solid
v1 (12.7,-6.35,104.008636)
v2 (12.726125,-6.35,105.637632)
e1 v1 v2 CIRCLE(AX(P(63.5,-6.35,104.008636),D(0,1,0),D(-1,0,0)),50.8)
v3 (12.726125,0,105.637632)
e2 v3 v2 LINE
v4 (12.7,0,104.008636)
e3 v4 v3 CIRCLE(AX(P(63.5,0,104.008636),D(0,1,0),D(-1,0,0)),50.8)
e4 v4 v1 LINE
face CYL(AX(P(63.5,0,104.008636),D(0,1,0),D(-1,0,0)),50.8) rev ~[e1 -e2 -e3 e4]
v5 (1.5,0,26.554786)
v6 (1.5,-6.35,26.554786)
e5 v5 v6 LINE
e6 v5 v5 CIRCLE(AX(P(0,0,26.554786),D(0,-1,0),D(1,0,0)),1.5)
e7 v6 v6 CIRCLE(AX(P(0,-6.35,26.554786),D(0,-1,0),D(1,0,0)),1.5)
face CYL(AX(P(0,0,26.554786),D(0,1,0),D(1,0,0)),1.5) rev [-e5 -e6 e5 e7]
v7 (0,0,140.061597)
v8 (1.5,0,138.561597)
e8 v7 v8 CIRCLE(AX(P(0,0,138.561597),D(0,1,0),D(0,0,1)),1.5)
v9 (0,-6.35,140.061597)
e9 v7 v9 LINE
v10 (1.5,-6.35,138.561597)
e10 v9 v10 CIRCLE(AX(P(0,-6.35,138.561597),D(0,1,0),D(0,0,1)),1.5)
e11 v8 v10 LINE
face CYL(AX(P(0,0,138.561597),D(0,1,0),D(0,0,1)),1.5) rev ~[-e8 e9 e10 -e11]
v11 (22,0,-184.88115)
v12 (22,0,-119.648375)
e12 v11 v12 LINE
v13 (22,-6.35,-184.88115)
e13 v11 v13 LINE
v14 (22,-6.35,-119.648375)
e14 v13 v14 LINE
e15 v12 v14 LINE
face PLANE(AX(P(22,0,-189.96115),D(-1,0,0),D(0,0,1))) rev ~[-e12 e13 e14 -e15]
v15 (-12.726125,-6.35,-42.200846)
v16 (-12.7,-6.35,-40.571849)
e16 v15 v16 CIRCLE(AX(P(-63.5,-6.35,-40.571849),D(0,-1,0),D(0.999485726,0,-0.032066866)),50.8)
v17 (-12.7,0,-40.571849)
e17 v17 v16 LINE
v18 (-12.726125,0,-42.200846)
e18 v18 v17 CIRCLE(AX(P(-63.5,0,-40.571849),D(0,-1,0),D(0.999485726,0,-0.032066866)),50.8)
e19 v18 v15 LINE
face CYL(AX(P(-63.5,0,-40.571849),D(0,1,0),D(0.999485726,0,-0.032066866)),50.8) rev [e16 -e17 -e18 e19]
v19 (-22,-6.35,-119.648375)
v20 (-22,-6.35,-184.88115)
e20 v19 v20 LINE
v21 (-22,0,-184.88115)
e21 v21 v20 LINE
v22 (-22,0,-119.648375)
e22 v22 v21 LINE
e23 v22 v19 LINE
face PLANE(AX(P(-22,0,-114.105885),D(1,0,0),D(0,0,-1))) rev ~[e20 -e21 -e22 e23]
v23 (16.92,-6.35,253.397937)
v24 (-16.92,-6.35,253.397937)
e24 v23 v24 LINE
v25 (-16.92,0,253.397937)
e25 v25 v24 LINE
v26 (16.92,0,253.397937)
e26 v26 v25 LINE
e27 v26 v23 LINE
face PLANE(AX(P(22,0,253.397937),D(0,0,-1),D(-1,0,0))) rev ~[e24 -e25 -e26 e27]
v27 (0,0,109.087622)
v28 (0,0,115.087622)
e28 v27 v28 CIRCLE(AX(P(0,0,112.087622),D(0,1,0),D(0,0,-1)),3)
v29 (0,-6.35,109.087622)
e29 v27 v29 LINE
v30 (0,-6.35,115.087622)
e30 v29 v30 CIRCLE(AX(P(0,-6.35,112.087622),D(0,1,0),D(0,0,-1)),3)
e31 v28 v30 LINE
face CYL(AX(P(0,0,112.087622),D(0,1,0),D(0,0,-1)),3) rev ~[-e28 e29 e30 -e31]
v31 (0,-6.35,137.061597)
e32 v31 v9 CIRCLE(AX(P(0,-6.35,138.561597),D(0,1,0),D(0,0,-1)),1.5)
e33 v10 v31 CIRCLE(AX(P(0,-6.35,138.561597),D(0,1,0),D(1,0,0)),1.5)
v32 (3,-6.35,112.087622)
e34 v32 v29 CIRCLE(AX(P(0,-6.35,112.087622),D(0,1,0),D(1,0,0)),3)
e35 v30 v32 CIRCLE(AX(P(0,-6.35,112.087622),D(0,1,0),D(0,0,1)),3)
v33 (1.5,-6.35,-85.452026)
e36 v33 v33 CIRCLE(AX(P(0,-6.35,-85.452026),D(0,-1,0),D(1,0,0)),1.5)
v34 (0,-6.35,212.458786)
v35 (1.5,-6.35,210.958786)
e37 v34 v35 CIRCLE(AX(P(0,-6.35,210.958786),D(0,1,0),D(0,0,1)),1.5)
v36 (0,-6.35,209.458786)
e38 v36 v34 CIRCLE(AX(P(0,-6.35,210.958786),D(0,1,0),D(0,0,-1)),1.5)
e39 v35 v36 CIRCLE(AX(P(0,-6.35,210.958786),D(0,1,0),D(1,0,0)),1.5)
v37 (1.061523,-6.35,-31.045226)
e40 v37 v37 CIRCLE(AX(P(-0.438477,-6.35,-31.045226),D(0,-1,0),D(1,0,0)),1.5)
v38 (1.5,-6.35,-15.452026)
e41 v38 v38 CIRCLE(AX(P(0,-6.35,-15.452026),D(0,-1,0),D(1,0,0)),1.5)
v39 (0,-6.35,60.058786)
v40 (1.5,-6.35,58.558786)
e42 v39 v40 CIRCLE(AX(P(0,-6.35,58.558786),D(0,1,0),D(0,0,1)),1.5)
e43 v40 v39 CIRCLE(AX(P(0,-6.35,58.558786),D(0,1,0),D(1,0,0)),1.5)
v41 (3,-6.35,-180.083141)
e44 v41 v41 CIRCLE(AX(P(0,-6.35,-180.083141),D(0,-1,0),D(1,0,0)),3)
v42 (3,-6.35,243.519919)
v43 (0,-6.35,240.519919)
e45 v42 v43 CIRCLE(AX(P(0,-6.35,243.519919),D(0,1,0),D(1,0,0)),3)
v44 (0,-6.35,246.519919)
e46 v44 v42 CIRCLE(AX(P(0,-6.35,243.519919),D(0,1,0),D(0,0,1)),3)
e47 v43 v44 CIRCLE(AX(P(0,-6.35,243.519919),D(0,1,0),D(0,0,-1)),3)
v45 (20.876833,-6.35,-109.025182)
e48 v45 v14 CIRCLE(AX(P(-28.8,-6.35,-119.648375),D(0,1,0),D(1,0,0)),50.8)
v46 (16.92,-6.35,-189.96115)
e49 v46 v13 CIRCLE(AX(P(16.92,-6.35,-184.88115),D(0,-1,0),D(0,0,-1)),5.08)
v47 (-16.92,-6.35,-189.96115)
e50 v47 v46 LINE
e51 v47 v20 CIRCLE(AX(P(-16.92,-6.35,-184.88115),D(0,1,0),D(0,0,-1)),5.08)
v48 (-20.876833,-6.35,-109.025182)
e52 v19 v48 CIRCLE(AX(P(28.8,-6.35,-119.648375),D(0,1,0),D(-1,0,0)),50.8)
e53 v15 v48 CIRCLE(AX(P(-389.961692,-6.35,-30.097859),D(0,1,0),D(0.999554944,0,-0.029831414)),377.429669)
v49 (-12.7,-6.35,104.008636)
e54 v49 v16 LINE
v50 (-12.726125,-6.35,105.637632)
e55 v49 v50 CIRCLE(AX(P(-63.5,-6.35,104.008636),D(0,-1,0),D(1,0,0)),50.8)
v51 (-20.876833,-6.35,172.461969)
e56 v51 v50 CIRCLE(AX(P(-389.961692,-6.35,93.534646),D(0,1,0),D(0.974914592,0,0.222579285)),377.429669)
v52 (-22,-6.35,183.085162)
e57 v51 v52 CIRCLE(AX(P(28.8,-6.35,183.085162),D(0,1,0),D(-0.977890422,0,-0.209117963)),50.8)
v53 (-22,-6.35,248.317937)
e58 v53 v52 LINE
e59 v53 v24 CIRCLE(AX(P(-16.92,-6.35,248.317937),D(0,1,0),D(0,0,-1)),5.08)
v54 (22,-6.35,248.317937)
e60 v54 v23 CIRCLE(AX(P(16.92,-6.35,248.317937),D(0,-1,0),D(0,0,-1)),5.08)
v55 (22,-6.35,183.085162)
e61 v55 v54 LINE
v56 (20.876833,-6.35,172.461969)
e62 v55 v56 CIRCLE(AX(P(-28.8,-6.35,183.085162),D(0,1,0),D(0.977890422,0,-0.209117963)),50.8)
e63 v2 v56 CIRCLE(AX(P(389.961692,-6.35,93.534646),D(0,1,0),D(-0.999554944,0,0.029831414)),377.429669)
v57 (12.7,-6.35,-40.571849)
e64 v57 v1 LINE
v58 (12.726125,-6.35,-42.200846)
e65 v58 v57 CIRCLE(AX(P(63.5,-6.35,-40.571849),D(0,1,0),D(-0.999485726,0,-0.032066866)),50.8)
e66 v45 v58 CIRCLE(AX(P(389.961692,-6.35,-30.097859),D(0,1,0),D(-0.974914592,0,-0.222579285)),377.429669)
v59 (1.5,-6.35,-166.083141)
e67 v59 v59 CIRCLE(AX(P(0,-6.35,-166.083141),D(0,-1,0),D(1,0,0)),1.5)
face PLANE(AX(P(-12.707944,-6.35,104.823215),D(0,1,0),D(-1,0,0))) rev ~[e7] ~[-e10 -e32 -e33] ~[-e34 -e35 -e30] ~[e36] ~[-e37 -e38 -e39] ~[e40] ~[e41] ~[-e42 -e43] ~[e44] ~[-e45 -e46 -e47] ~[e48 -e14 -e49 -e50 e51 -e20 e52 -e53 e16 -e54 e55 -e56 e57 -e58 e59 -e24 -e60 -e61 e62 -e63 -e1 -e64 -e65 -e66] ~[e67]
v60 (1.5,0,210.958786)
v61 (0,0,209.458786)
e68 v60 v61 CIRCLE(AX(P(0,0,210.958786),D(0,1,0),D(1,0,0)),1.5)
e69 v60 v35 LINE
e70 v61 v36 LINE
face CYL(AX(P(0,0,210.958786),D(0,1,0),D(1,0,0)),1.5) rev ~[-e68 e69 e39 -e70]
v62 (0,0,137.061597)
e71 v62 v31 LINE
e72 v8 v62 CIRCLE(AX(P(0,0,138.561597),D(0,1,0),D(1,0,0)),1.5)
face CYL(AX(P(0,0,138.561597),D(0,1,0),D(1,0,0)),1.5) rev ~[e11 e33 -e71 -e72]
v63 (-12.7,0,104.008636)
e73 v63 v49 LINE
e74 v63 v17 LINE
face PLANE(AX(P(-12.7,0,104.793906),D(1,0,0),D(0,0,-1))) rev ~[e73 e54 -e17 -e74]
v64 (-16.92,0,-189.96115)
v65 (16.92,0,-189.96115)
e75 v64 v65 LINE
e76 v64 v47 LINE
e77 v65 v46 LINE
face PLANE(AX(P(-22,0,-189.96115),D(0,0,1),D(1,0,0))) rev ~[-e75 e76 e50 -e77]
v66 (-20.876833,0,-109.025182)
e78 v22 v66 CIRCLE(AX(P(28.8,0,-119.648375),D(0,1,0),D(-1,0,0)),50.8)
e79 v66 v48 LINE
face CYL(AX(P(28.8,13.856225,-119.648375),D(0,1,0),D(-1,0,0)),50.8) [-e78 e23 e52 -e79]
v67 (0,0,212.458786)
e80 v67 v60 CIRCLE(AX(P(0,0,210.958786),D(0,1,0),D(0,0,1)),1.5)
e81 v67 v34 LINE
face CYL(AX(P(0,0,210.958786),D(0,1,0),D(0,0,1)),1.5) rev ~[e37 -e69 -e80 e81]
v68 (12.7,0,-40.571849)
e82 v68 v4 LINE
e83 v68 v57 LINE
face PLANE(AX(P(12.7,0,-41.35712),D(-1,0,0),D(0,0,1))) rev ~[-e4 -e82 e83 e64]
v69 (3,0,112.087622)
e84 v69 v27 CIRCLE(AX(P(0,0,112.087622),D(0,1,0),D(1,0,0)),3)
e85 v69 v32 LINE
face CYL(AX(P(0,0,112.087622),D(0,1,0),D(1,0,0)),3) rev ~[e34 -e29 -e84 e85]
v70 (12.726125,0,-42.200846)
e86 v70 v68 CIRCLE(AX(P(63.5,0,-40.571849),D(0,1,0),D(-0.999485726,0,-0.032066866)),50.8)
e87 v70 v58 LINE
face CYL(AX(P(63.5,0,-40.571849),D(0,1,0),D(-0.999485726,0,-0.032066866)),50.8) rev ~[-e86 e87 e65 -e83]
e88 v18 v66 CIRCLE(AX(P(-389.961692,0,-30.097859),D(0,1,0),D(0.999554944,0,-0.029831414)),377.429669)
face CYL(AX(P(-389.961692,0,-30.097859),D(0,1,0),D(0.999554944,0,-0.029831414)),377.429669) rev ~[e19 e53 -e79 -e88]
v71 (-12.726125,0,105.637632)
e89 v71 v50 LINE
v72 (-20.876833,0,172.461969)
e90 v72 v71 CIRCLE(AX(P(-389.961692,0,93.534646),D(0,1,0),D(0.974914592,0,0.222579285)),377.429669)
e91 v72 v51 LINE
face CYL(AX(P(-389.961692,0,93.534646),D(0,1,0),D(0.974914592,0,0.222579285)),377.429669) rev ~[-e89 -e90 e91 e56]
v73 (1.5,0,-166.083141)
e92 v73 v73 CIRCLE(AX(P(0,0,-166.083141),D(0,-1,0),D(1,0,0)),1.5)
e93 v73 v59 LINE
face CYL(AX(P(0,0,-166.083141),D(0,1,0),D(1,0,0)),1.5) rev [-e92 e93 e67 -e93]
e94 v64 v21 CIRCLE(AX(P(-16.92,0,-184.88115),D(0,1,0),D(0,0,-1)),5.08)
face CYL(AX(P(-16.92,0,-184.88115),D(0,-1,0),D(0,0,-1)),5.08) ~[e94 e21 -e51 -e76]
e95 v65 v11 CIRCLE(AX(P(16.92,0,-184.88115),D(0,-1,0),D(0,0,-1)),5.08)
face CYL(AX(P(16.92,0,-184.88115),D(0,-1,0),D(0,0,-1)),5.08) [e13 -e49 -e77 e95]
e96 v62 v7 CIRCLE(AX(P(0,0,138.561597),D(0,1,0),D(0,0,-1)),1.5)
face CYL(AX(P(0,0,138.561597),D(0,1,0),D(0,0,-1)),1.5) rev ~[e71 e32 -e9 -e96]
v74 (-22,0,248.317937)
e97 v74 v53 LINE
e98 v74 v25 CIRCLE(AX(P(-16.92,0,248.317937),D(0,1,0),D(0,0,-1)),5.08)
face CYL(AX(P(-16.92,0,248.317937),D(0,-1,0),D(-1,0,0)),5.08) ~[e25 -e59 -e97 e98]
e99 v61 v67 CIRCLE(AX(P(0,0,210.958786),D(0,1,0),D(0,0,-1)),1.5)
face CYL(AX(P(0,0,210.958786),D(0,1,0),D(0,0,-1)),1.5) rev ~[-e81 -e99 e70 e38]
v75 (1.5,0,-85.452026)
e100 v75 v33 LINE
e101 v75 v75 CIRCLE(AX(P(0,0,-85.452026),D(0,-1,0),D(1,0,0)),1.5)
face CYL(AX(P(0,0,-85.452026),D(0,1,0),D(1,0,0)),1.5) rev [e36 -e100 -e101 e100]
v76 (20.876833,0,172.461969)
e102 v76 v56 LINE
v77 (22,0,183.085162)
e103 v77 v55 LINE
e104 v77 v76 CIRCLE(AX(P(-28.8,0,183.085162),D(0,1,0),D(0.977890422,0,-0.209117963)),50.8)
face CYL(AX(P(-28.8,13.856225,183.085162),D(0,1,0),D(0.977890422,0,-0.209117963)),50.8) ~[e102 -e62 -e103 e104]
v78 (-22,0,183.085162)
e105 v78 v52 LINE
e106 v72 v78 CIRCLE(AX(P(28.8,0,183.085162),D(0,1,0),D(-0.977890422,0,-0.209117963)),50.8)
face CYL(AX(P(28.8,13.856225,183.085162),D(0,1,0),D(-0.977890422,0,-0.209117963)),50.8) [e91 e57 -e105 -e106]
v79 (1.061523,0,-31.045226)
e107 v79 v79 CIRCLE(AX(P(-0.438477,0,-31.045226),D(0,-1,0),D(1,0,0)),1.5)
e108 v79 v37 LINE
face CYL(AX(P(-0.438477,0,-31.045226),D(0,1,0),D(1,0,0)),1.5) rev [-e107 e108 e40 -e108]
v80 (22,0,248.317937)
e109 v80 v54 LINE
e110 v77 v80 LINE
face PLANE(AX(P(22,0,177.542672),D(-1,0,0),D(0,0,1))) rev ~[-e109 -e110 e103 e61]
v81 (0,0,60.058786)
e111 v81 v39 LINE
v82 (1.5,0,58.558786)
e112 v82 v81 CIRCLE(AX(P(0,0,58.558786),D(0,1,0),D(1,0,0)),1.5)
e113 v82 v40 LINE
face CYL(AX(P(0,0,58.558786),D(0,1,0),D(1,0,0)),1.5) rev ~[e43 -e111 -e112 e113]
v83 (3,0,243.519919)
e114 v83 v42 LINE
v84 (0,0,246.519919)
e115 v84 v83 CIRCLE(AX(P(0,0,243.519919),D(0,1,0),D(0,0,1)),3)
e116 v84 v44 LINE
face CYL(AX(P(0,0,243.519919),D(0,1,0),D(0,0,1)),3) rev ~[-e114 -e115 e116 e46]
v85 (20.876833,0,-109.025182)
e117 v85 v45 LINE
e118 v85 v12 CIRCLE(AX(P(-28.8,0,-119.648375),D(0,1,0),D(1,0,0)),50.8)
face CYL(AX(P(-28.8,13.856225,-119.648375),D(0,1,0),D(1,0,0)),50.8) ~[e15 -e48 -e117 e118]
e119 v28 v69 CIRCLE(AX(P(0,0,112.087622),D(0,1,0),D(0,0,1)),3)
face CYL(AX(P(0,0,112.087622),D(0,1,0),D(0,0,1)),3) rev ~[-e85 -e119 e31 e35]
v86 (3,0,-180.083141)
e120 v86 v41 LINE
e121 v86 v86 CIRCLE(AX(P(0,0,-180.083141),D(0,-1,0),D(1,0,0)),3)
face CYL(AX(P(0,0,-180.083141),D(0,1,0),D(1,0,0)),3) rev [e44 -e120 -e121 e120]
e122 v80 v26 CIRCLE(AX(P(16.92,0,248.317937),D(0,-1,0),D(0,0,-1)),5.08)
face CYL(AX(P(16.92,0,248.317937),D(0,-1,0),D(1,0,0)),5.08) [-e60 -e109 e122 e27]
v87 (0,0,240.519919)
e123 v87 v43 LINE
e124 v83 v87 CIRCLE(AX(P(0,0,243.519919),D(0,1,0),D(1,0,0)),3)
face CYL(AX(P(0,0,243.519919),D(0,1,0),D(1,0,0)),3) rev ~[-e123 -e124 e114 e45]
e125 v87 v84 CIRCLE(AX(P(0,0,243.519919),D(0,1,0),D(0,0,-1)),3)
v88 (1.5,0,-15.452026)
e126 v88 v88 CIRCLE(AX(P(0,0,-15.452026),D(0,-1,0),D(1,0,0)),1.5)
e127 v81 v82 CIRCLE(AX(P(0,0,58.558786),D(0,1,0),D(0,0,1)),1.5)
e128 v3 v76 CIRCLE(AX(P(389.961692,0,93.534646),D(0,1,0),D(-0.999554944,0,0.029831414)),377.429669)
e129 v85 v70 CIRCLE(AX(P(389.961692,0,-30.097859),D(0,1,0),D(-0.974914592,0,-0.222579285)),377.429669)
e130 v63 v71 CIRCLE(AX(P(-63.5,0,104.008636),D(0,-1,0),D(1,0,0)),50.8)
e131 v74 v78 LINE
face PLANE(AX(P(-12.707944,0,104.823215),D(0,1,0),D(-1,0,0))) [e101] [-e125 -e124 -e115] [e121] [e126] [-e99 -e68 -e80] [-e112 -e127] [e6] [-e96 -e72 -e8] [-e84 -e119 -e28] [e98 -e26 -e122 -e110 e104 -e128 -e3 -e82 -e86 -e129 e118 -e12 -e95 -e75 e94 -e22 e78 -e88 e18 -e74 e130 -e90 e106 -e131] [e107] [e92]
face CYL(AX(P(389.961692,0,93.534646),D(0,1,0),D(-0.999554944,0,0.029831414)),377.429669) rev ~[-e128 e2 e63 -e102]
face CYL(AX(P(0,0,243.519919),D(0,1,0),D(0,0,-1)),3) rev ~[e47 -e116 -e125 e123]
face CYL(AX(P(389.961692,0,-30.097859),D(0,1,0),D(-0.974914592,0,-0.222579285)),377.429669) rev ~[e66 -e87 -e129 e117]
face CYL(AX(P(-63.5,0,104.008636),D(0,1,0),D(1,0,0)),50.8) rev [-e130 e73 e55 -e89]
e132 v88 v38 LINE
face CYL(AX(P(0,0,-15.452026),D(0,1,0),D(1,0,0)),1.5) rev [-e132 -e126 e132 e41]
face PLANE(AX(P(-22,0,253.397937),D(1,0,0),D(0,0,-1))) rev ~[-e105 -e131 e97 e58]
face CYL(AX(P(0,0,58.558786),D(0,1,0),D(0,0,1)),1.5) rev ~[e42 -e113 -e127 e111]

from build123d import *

# Parameters (mm, degrees)
F0_R        = 1.5
F0_R_2      = 3
F1_DEPTH    = 6.35
F2_R        = 5.08
F3_T1_DEPTH = 6.35
F3_T3_DEPTH = 34.0624500619


# Not quite as in the source:
# - a fillet or chamfer that OpenCascade refuses, or shapes differently, is made with other operations: its cross-section is extruded or revolved along the edge and cut away or added
# - a feature names something its author has since deleted; it is built from what else it names


with BuildPart() as f1:
    # F0 (on Front) → F1 (new body)
    with BuildSketch(Plane.XZ):
        with BuildLine():
            Line((-22, -189.9611499309), (-4.6853246795, -189.9611499309))
            Line((-4.6853246795, -189.9611499309), (0, -189.9611499309))
            Line((0, -189.9611499309), (4.6853246795, -189.9611499309))
            Line((4.6853246795, -189.9611499309), (22, -189.9611499309))
            Line((22, -189.9611499309), (22, -172.8709284505))
            Line((22, -172.8709284505), (22, -161.9910197589))
            Line((22, -161.9910197589), (22, -114.1058849427))
            ThreePointArc((22, -114.1058849427), (15.5787747464, -77.9579307824), (12.7, -41.3571195934))
            Line((12.7, -41.3571195934), (12.7, 104.7939062119))
            ThreePointArc((12.7, 104.7939062119), (15.5787747464, 141.3947174009), (22, 177.5426715612))
            Line((22, 177.5426715612), (22, 225.4278063774))
            Line((22, 225.4278063774), (22, 236.307715069))
            Line((22, 236.307715069), (22, 253.3979365494))
            Line((22, 253.3979365494), (4.6853246795, 253.3979365494))
            Line((4.6853246795, 253.3979365494), (0, 253.3979365494))
            Line((0, 253.3979365494), (-4.6853246795, 253.3979365494))
            Line((-4.6853246795, 253.3979365494), (-22, 253.3979365494))
            Line((-22, 253.3979365494), (-22, 236.307715069))
            Line((-22, 236.307715069), (-22, 225.4278063774))
            Line((-22, 225.4278063774), (-22, 177.5426715612))
            ThreePointArc((-22, 177.5426715612), (-15.5787747464, 141.3947174009), (-12.7, 104.7939062119))
            Line((-12.7, 104.7939062119), (-12.7, -41.3571195934))
            ThreePointArc((-12.7, -41.3571195934), (-15.5787747464, -77.9579307824), (-22, -114.1058849427))
            Line((-22, -114.1058849427), (-22, -161.9910197589))
            Line((-22, -161.9910197589), (-22, -172.8709284505))
            Line((-22, -172.8709284505), (-22, -189.9611499309))
        make_face()
        with Locations((-0.4384766798, -31.0452261312)):
            Circle(F0_R, mode=Mode.SUBTRACT)
        with Locations((0, -180.0831407309)):
            Circle(F0_R_2, mode=Mode.SUBTRACT)
        with Locations((0, -166.0831407309)):
            Circle(F0_R, mode=Mode.SUBTRACT)
        with Locations((0, -85.4520261312)):
            Circle(F0_R, mode=Mode.SUBTRACT)
        with Locations((0, -15.4520261312)):
            Circle(F0_R, mode=Mode.SUBTRACT)
        with Locations((0, 26.5547856688)):
            Circle(F0_R, mode=Mode.SUBTRACT)
        with BuildLine():
            ThreePointArc((1.5, 58.5587856688), (-1.0606601718, 57.4981254971), (0, 60.0587856688))
            ThreePointArc((0, 60.0587856688), (1.0606601718, 59.6194458406), (1.5, 58.5587856688))
        make_face(mode=Mode.SUBTRACT)
        with BuildLine():
            ThreePointArc((0, 109.0876222849), (-3, 112.0876222849), (0, 115.0876222849))
            ThreePointArc((0, 115.0876222849), (2.1213203436, 114.2089426284), (3, 112.0876222849))
            ThreePointArc((3, 112.0876222849), (2.1213203436, 109.9663019413), (0, 109.0876222849))
        make_face(mode=Mode.SUBTRACT)
        with BuildLine():
            ThreePointArc((0, 137.0615974688), (-1.5, 138.5615974688), (0, 140.0615974688))
            ThreePointArc((0, 140.0615974688), (1.0606601718, 139.6222576406), (1.5, 138.5615974688))
            ThreePointArc((1.5, 138.5615974688), (1.0606601718, 137.5009372971), (0, 137.0615974688))
        make_face(mode=Mode.SUBTRACT)
        with BuildLine():
            ThreePointArc((0, 209.4587856688), (-1.5, 210.9587856688), (0, 212.4587856688))
            ThreePointArc((0, 212.4587856688), (1.0606601718, 212.0194458406), (1.5, 210.9587856688))
            ThreePointArc((1.5, 210.9587856688), (1.0606601718, 209.8981254971), (0, 209.4587856688))
        make_face(mode=Mode.SUBTRACT)
        with BuildLine():
            ThreePointArc((0, 240.5199192026), (-3, 243.5199192026), (0, 246.5199192026))
            ThreePointArc((0, 246.5199192026), (2.1213203436, 245.6412395461), (3, 243.5199192026))
            ThreePointArc((3, 243.5199192026), (2.1213203436, 241.398598859), (0, 240.5199192026))
        make_face(mode=Mode.SUBTRACT)
    extrude(amount=F1_DEPTH)

    # F2
    f2_edges = [f1.edges().sort_by_distance(p)[0] for p in [
        (-22, -3.175, 253.397937),
        (22, -3.175, 253.397937),
        (22, -3.175, -189.96115),
        (-22, -3.175, -189.96115),
    ]]
    fillet(f2_edges, radius=F2_R)

    # F3: fillet of radius 50.8 on 8 edges, made by hand

    # F3_s2 → F3_t1 (join)
    with BuildSketch(Plane.XZ):
        with BuildLine():
            ThreePointArc((-12.7, 104.0086355302), (-12.7065317021, 104.8232386677), (-12.7261251288, 105.6376323271))
            ThreePointArc((-12.7261251288, 105.6376323271), (-12.7128266876, 105.2157765732), (-12.7, 104.7939062119))
            Line((-12.7, 104.7939062119), (-12.7, 104.0086355302))
        make_face()
        with BuildLine():
            ThreePointArc((12.7, 104.0086355302), (12.7065317021, 104.8232386677), (12.7261251288, 105.6376323271))
            ThreePointArc((12.7261251288, 105.6376323271), (12.7128266876, 105.2157765732), (12.7, 104.7939062119))
            Line((12.7, 104.7939062119), (12.7, 104.0086355302))
        make_face()
        with BuildLine():
            ThreePointArc((12.7261251288, -42.2008457086), (12.7065317021, -41.3864520492), (12.7, -40.5718489117))
            Line((12.7, -40.5718489117), (12.7, -41.3571195934))
            ThreePointArc((12.7, -41.3571195934), (12.7128266876, -41.7789899547), (12.7261251288, -42.2008457086))
        make_face()
        with BuildLine():
            ThreePointArc((-12.7261251288, -42.2008457086), (-12.7065317021, -41.3864520492), (-12.7, -40.5718489116))
            Line((-12.7, -40.5718489116), (-12.7, -41.3571195934))
            ThreePointArc((-12.7, -41.3571195934), (-12.7128266876, -41.7789899547), (-12.7261251288, -42.2008457086))
        make_face()
    extrude(amount=F3_T1_DEPTH)

    # F3_s4 → F3_t3 (cut)
    with BuildSketch(Plane.XZ.offset(-13.856225031)):
        with BuildLine():
            ThreePointArc((-22, -119.6483749551), (-21.7184280188, -114.3071737314), (-20.8768334444, -109.025182453))
            ThreePointArc((-20.8768334444, -109.025182453), (-21.429661091, -111.5674692633), (-22, -114.1058849427))
            Line((-22, -114.1058849427), (-22, -119.6483749551))
        make_face()
        with BuildLine():
            ThreePointArc((22, -119.6483749551), (21.7184280188, -114.3071737314), (20.8768334444, -109.025182453))
            ThreePointArc((20.8768334444, -109.025182453), (21.429661091, -111.5674692633), (22, -114.1058849427))
            Line((22, -114.1058849427), (22, -119.6483749551))
        make_face()
        with BuildLine():
            ThreePointArc((20.8768334444, 172.4619690715), (21.7184280188, 177.7439603499), (22, 183.0851615736))
            Line((22, 183.0851615736), (22, 177.5426715612))
            ThreePointArc((22, 177.5426715612), (21.429661091, 175.0042558818), (20.8768334444, 172.4619690715))
        make_face()
        with BuildLine():
            ThreePointArc((-20.8768334444, 172.4619690715), (-21.7184280188, 177.7439603499), (-22, 183.0851615736))
            Line((-22, 183.0851615736), (-22, 177.5426715612))
            ThreePointArc((-22, 177.5426715612), (-21.429661091, 175.0042558818), (-20.8768334444, 172.4619690715))
        make_face()
    extrude(amount=F3_T3_DEPTH, mode=Mode.SUBTRACT)


solid = f1.part
